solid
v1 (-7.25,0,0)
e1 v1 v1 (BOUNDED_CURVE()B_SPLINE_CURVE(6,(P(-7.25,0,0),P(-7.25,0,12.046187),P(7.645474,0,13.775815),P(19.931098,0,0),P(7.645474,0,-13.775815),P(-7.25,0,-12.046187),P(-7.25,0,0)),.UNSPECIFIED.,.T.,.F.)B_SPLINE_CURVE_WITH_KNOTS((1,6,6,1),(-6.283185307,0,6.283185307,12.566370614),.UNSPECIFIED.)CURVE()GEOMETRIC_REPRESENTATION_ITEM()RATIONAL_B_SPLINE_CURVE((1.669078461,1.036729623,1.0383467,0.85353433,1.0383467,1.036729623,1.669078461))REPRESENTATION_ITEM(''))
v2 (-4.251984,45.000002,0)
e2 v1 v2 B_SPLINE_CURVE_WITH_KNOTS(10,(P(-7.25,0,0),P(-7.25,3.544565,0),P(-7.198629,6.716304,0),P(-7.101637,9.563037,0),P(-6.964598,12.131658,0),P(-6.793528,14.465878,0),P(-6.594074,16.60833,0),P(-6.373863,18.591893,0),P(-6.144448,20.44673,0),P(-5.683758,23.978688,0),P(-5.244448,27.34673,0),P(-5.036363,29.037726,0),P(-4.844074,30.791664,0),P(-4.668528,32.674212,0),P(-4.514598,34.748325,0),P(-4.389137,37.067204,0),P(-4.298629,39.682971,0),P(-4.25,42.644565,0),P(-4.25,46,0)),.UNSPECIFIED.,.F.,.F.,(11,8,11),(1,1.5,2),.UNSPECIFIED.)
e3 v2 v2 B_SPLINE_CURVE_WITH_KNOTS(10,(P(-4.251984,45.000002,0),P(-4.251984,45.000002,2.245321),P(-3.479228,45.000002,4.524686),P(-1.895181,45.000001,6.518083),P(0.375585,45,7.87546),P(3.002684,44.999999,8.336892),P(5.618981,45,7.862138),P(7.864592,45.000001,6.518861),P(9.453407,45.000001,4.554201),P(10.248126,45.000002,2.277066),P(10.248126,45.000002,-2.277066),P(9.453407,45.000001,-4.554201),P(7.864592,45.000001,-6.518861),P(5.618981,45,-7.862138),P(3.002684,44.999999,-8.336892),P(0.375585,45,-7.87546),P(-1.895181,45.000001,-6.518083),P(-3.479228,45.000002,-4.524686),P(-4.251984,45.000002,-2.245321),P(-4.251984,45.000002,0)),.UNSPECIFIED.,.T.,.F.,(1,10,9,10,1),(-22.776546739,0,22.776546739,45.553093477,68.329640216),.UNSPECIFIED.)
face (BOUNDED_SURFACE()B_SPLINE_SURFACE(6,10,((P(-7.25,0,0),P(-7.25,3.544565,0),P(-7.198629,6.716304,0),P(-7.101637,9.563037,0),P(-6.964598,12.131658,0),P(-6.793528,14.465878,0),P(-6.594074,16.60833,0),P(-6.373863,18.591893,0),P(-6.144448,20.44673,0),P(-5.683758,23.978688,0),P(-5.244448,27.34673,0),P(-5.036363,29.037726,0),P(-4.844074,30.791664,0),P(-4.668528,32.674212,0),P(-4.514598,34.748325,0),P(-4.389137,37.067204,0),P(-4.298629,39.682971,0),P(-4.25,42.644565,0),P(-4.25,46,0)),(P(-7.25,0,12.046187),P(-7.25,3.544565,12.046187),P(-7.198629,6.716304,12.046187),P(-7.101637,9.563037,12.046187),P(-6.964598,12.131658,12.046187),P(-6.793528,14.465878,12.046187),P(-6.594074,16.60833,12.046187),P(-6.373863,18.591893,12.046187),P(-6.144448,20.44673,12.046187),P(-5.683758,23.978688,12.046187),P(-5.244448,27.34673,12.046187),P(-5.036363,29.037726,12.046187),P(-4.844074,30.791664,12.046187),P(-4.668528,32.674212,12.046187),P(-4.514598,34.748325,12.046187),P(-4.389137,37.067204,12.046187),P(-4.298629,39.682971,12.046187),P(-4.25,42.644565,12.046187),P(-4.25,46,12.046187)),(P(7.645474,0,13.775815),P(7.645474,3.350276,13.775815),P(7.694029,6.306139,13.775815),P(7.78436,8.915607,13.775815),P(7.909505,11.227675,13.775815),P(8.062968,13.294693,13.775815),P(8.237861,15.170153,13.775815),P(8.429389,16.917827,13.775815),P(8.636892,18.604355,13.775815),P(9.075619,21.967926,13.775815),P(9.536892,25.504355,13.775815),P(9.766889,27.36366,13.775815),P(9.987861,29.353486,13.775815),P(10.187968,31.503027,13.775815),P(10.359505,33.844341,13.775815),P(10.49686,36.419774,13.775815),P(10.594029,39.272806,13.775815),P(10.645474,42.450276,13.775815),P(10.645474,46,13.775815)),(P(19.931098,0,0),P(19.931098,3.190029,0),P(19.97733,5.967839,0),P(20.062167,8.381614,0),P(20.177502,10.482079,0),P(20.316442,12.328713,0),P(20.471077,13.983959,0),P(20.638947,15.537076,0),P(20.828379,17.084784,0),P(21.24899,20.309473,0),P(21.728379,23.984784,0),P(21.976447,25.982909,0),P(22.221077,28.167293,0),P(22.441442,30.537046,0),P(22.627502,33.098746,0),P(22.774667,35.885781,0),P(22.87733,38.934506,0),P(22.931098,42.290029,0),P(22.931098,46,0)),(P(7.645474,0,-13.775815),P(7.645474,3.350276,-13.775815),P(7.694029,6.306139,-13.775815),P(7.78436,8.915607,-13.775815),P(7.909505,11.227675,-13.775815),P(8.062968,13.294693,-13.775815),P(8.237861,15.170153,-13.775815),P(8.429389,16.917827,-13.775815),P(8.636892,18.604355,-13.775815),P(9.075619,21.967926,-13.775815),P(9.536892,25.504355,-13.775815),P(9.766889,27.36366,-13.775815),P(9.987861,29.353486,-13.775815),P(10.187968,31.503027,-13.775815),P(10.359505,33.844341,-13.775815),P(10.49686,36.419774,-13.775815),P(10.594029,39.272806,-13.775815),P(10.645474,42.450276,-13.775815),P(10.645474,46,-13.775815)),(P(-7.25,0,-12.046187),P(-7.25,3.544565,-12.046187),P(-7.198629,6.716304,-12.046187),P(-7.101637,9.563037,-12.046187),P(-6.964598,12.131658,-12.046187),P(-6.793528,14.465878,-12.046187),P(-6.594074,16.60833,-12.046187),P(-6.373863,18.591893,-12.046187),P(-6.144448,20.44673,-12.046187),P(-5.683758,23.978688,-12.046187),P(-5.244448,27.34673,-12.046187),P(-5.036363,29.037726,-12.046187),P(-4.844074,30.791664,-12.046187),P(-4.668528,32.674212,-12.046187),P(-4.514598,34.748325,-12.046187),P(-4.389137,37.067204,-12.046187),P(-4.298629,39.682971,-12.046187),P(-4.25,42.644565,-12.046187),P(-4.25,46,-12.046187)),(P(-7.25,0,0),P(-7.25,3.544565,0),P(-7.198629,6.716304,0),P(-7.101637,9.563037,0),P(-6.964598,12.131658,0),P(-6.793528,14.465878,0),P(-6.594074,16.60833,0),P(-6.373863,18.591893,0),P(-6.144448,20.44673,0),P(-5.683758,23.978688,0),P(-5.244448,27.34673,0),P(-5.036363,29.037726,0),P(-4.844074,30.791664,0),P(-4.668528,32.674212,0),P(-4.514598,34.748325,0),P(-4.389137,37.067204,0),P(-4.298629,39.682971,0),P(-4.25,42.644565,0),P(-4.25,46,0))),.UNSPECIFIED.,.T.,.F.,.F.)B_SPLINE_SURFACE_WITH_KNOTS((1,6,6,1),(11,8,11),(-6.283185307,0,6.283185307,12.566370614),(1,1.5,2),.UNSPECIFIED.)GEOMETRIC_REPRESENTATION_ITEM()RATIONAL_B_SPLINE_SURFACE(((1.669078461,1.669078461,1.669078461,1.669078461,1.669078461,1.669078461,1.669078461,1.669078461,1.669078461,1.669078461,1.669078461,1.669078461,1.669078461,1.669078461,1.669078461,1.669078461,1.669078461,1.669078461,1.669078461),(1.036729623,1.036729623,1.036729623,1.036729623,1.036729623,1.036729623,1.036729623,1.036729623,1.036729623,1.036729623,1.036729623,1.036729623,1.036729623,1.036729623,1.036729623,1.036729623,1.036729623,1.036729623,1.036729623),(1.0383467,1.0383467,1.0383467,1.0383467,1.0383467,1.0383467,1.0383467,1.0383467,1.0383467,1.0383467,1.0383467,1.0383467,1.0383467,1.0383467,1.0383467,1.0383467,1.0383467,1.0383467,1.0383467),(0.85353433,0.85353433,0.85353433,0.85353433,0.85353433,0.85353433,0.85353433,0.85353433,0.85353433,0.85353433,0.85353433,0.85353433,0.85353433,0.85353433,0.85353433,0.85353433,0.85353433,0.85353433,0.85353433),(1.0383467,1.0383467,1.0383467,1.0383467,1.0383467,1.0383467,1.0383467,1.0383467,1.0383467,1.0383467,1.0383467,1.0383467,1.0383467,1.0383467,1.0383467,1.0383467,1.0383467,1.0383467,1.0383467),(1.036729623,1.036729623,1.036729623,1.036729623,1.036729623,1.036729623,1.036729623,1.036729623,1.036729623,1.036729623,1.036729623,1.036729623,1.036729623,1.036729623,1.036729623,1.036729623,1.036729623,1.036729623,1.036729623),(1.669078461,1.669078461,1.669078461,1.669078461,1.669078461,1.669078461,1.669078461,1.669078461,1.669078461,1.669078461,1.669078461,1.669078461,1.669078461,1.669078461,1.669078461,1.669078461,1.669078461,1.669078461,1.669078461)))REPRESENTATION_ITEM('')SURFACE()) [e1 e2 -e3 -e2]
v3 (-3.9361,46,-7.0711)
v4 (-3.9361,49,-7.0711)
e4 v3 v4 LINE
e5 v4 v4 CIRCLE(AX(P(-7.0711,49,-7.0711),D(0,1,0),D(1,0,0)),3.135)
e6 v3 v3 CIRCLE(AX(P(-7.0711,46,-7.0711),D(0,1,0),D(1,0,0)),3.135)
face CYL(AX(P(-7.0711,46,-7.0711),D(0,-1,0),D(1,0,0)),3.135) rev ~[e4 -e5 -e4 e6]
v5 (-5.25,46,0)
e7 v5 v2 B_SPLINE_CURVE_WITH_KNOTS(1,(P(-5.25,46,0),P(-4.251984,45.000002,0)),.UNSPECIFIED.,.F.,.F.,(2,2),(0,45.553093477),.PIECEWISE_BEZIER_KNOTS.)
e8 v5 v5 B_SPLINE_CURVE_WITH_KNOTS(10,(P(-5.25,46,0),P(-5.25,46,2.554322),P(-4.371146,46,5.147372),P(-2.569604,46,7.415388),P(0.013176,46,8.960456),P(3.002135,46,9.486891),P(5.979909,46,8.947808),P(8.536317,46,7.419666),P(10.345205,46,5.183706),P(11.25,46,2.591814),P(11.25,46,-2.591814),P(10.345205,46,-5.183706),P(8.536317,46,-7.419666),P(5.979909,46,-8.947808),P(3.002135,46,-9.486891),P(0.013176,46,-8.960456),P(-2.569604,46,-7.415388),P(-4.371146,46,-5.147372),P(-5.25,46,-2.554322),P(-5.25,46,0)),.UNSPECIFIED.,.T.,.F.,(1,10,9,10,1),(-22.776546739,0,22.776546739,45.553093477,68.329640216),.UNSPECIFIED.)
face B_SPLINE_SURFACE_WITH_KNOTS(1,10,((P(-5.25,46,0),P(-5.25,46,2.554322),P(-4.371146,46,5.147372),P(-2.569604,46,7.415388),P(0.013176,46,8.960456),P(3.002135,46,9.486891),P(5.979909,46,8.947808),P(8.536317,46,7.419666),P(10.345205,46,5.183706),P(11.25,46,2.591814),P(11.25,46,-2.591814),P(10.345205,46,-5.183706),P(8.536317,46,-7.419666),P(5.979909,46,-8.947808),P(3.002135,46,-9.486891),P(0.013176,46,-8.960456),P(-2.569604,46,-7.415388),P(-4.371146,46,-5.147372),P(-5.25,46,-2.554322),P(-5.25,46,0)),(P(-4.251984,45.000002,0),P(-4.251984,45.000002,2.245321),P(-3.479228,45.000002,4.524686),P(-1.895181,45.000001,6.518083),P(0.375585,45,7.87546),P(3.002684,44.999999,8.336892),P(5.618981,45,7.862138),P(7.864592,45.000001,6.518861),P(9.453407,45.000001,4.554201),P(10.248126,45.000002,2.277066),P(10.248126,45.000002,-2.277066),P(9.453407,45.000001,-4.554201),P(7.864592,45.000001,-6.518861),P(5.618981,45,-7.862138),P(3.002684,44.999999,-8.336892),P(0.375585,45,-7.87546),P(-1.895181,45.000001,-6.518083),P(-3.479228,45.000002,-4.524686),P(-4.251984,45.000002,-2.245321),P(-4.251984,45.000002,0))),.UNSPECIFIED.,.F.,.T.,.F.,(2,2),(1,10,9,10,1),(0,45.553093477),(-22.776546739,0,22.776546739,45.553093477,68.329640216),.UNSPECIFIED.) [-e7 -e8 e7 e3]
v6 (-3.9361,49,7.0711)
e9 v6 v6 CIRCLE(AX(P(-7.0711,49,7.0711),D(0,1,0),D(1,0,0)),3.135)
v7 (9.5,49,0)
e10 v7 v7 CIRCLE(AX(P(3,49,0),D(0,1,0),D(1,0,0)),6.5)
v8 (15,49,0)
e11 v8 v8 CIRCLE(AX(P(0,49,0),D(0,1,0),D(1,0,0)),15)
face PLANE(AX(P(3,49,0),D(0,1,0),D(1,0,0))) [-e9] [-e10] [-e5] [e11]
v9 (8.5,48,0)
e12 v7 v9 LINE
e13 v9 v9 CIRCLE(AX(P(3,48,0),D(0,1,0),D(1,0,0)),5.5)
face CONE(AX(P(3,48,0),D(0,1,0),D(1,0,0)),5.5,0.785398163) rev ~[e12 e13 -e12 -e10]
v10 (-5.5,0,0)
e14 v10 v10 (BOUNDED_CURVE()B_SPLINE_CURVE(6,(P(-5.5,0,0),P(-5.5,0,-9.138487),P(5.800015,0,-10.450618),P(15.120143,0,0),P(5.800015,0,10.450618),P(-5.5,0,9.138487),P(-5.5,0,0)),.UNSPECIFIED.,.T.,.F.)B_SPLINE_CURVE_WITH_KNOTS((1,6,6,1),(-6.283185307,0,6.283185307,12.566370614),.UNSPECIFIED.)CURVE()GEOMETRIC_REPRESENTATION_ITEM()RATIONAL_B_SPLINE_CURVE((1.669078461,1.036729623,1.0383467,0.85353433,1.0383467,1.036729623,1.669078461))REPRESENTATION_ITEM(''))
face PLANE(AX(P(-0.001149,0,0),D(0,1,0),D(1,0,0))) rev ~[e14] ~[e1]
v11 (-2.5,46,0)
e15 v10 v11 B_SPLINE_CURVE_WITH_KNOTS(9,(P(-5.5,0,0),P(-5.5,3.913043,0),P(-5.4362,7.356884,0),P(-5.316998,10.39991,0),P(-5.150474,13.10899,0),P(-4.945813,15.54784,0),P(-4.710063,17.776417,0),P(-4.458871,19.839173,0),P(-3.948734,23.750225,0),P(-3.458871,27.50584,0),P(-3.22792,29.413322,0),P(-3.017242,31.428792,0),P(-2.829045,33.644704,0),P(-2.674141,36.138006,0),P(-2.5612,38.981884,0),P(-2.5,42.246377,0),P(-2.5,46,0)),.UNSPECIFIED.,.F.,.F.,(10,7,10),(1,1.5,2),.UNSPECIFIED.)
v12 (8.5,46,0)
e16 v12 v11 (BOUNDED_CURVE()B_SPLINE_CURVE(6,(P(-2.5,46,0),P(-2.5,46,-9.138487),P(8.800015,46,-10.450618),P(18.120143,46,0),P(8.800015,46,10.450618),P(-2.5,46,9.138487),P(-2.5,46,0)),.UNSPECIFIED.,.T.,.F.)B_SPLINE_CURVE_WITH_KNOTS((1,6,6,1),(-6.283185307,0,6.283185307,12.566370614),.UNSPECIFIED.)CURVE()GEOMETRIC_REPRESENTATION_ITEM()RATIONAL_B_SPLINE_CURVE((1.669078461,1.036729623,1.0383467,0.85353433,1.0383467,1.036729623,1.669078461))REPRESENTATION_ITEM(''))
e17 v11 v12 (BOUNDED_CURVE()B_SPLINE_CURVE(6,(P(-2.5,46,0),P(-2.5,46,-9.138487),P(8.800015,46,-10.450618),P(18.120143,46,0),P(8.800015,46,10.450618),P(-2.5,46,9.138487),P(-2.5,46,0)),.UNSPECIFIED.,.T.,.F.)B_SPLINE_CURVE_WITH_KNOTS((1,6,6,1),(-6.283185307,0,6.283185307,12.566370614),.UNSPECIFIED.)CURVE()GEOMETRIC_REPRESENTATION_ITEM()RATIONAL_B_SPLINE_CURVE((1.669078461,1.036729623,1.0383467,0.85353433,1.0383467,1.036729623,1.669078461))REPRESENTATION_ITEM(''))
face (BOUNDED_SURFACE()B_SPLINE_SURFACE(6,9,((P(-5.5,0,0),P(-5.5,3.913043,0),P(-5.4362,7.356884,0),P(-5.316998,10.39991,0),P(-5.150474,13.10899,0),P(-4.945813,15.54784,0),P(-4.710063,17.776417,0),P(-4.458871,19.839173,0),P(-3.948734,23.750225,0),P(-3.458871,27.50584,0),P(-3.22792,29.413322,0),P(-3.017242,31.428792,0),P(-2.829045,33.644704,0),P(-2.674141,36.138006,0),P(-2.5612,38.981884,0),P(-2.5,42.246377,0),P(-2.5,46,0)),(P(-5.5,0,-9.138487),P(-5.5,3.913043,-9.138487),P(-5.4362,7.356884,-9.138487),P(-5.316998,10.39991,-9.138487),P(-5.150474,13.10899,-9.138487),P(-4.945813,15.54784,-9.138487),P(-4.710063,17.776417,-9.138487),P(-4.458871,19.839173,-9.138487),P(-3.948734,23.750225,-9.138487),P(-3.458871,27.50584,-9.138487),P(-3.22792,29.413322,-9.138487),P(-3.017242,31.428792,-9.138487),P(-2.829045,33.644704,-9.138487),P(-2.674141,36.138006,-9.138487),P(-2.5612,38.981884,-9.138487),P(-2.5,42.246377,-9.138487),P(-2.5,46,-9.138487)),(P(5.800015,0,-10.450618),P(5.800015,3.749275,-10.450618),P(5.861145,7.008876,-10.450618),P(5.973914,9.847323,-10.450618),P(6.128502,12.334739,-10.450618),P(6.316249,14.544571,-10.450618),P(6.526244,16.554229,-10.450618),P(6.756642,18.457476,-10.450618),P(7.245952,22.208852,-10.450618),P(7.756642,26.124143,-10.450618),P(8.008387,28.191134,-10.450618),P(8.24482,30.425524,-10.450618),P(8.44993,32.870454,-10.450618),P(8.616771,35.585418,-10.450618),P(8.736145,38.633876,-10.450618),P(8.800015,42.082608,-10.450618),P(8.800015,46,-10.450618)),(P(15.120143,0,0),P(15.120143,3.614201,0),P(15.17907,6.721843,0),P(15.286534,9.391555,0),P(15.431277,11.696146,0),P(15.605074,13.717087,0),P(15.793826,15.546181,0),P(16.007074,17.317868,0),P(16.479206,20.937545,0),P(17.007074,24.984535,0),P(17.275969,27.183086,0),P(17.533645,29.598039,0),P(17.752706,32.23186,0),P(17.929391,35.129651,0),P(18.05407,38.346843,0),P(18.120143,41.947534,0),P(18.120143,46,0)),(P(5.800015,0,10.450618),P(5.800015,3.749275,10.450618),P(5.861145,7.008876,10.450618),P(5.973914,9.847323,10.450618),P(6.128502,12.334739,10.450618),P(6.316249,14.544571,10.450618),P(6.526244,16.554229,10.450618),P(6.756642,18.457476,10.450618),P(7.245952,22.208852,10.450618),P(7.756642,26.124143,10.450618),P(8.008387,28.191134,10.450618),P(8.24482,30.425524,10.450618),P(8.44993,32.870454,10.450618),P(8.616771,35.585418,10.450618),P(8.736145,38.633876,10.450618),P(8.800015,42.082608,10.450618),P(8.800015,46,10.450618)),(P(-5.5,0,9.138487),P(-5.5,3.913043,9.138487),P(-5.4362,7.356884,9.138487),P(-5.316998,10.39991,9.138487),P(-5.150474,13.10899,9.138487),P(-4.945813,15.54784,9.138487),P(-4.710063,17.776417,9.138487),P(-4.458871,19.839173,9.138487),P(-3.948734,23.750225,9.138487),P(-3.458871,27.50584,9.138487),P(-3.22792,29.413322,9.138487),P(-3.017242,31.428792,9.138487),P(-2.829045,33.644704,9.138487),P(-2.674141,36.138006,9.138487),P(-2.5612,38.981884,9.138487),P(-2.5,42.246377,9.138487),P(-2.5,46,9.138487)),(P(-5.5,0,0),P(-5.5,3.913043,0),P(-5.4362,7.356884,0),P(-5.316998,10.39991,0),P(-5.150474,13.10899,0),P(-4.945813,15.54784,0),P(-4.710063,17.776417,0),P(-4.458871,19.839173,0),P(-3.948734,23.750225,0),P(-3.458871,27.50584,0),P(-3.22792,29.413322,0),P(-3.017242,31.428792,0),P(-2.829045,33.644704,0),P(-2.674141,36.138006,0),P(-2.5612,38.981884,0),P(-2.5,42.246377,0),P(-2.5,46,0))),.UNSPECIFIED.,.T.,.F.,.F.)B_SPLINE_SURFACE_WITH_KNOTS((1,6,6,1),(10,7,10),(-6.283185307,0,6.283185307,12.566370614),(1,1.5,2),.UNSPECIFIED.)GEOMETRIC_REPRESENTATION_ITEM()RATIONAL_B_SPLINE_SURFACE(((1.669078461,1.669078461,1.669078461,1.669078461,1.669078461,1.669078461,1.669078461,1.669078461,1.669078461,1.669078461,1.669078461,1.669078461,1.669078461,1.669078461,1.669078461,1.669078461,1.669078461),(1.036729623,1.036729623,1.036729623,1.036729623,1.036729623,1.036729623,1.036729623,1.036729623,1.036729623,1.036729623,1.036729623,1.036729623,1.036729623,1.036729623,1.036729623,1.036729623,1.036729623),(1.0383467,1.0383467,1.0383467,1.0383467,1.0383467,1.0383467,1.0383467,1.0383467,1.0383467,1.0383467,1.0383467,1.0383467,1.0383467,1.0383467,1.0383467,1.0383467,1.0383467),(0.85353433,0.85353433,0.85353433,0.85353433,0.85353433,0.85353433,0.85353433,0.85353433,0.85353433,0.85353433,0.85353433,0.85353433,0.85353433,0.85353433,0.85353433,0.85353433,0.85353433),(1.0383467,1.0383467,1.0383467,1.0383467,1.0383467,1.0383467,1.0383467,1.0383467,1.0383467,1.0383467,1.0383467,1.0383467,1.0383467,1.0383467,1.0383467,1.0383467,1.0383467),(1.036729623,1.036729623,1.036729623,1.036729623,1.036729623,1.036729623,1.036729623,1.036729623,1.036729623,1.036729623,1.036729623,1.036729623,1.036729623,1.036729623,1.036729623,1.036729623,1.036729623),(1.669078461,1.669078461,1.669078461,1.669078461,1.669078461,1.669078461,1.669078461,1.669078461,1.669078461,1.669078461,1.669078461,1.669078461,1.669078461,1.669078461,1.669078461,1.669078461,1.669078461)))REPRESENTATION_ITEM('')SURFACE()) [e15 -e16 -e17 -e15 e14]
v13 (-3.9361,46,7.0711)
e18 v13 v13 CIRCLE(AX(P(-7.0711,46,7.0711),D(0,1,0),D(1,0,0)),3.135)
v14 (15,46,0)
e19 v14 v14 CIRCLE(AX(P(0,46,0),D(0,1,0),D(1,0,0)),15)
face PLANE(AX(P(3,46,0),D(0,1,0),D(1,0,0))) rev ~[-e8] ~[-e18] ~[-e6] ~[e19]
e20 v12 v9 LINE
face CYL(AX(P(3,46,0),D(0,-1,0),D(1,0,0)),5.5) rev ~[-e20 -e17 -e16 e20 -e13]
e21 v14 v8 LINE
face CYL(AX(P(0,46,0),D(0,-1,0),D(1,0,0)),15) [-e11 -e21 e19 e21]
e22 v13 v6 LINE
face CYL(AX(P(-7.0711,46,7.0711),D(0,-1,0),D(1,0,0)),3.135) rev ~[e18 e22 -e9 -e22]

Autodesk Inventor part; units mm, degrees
ref_plane "YZ Plane" through (0, 0, 0) normal (1, 0, 0) x (0, 1, 0)
ref_plane "XZ Plane" through (0, 0, 0) normal (0, 1, 0) x (-1, 0, 0)
ref_plane "XY Plane" through (0, 0, 0) normal (0, 0, 1) x (1, 0, 0)
sketch "Sketch1" plane through (0, 0, 0) normal (0, 1, 0) x (-1, 0, 0)
  circle A0 centre (0, 0) radius 7.25
  circle A1 centre (0, 0) radius 5.5
  dimension "d0" = 14.5
  dimension "d7" = 11
sketch "Sketch2" plane through (0, 0, 0) normal (0, 0, 1) x (1, 0, 0)
  line L0 (0, 0) -> (0, 23) construction
  line L1 (0, 23) -> (3, 23) construction
  line L2 (3, 23) -> (3, 46) construction
  spline S0 degree 3 poles (0, 0) (0, 23) (3, 23) (3, 46) knots 1 1 1 1 2 2 2 2
  line L3 (0, 46) -> (0, 0) construction
  line L4 (0, 46) -> (3, 46) construction
  dimension "d1" = 46
  dimension "d3" = 3
sweep "Sweep1" add profiles "Sketch1" path "Sketch2"
sketch "Sketch3" plane through (3, 46, 0) normal (0, 1, 0) x (1, 0, 0)
  circle A0 centre (-3, 0) radius 15
  circle A1 centre (-10.0711, 7.0711) radius 3.135
  circle A2 centre (-10.0711, -7.0711) radius 3.135
  circle A3 centre (-3, 0) radius 7.25 construction
  line L0 (-10.0711, 7.0711) -> (-3, 0) construction
  line L1 (-3, 0) -> (-18, 0) construction
  line L2 (-3, 0) -> (-10.0711, -7.0711) construction
  circle A4 centre (0, 0) radius 5.5 projected
  point P0 (-10.25, 0)
  point P1 (-5.5, 0)
  dimension "d8" = 30
  dimension "d9" = 6.27
  dimension "d10" = 45
  dimension "d11" = 45
  dimension "d12" = 10
extrude "Extrusion1" add sketch "Sketch3" along normal blind 3
chamfer "Chamfer1" distance 1 angle 45 1 edges at (10.25, 46, 0)
chamfer "Chamfer2" distance 1 angle 45 1 edges at (-2.5, 49, 0)
properties part number "Nipple-3dprinted-metal" material "Stainless Steel"
